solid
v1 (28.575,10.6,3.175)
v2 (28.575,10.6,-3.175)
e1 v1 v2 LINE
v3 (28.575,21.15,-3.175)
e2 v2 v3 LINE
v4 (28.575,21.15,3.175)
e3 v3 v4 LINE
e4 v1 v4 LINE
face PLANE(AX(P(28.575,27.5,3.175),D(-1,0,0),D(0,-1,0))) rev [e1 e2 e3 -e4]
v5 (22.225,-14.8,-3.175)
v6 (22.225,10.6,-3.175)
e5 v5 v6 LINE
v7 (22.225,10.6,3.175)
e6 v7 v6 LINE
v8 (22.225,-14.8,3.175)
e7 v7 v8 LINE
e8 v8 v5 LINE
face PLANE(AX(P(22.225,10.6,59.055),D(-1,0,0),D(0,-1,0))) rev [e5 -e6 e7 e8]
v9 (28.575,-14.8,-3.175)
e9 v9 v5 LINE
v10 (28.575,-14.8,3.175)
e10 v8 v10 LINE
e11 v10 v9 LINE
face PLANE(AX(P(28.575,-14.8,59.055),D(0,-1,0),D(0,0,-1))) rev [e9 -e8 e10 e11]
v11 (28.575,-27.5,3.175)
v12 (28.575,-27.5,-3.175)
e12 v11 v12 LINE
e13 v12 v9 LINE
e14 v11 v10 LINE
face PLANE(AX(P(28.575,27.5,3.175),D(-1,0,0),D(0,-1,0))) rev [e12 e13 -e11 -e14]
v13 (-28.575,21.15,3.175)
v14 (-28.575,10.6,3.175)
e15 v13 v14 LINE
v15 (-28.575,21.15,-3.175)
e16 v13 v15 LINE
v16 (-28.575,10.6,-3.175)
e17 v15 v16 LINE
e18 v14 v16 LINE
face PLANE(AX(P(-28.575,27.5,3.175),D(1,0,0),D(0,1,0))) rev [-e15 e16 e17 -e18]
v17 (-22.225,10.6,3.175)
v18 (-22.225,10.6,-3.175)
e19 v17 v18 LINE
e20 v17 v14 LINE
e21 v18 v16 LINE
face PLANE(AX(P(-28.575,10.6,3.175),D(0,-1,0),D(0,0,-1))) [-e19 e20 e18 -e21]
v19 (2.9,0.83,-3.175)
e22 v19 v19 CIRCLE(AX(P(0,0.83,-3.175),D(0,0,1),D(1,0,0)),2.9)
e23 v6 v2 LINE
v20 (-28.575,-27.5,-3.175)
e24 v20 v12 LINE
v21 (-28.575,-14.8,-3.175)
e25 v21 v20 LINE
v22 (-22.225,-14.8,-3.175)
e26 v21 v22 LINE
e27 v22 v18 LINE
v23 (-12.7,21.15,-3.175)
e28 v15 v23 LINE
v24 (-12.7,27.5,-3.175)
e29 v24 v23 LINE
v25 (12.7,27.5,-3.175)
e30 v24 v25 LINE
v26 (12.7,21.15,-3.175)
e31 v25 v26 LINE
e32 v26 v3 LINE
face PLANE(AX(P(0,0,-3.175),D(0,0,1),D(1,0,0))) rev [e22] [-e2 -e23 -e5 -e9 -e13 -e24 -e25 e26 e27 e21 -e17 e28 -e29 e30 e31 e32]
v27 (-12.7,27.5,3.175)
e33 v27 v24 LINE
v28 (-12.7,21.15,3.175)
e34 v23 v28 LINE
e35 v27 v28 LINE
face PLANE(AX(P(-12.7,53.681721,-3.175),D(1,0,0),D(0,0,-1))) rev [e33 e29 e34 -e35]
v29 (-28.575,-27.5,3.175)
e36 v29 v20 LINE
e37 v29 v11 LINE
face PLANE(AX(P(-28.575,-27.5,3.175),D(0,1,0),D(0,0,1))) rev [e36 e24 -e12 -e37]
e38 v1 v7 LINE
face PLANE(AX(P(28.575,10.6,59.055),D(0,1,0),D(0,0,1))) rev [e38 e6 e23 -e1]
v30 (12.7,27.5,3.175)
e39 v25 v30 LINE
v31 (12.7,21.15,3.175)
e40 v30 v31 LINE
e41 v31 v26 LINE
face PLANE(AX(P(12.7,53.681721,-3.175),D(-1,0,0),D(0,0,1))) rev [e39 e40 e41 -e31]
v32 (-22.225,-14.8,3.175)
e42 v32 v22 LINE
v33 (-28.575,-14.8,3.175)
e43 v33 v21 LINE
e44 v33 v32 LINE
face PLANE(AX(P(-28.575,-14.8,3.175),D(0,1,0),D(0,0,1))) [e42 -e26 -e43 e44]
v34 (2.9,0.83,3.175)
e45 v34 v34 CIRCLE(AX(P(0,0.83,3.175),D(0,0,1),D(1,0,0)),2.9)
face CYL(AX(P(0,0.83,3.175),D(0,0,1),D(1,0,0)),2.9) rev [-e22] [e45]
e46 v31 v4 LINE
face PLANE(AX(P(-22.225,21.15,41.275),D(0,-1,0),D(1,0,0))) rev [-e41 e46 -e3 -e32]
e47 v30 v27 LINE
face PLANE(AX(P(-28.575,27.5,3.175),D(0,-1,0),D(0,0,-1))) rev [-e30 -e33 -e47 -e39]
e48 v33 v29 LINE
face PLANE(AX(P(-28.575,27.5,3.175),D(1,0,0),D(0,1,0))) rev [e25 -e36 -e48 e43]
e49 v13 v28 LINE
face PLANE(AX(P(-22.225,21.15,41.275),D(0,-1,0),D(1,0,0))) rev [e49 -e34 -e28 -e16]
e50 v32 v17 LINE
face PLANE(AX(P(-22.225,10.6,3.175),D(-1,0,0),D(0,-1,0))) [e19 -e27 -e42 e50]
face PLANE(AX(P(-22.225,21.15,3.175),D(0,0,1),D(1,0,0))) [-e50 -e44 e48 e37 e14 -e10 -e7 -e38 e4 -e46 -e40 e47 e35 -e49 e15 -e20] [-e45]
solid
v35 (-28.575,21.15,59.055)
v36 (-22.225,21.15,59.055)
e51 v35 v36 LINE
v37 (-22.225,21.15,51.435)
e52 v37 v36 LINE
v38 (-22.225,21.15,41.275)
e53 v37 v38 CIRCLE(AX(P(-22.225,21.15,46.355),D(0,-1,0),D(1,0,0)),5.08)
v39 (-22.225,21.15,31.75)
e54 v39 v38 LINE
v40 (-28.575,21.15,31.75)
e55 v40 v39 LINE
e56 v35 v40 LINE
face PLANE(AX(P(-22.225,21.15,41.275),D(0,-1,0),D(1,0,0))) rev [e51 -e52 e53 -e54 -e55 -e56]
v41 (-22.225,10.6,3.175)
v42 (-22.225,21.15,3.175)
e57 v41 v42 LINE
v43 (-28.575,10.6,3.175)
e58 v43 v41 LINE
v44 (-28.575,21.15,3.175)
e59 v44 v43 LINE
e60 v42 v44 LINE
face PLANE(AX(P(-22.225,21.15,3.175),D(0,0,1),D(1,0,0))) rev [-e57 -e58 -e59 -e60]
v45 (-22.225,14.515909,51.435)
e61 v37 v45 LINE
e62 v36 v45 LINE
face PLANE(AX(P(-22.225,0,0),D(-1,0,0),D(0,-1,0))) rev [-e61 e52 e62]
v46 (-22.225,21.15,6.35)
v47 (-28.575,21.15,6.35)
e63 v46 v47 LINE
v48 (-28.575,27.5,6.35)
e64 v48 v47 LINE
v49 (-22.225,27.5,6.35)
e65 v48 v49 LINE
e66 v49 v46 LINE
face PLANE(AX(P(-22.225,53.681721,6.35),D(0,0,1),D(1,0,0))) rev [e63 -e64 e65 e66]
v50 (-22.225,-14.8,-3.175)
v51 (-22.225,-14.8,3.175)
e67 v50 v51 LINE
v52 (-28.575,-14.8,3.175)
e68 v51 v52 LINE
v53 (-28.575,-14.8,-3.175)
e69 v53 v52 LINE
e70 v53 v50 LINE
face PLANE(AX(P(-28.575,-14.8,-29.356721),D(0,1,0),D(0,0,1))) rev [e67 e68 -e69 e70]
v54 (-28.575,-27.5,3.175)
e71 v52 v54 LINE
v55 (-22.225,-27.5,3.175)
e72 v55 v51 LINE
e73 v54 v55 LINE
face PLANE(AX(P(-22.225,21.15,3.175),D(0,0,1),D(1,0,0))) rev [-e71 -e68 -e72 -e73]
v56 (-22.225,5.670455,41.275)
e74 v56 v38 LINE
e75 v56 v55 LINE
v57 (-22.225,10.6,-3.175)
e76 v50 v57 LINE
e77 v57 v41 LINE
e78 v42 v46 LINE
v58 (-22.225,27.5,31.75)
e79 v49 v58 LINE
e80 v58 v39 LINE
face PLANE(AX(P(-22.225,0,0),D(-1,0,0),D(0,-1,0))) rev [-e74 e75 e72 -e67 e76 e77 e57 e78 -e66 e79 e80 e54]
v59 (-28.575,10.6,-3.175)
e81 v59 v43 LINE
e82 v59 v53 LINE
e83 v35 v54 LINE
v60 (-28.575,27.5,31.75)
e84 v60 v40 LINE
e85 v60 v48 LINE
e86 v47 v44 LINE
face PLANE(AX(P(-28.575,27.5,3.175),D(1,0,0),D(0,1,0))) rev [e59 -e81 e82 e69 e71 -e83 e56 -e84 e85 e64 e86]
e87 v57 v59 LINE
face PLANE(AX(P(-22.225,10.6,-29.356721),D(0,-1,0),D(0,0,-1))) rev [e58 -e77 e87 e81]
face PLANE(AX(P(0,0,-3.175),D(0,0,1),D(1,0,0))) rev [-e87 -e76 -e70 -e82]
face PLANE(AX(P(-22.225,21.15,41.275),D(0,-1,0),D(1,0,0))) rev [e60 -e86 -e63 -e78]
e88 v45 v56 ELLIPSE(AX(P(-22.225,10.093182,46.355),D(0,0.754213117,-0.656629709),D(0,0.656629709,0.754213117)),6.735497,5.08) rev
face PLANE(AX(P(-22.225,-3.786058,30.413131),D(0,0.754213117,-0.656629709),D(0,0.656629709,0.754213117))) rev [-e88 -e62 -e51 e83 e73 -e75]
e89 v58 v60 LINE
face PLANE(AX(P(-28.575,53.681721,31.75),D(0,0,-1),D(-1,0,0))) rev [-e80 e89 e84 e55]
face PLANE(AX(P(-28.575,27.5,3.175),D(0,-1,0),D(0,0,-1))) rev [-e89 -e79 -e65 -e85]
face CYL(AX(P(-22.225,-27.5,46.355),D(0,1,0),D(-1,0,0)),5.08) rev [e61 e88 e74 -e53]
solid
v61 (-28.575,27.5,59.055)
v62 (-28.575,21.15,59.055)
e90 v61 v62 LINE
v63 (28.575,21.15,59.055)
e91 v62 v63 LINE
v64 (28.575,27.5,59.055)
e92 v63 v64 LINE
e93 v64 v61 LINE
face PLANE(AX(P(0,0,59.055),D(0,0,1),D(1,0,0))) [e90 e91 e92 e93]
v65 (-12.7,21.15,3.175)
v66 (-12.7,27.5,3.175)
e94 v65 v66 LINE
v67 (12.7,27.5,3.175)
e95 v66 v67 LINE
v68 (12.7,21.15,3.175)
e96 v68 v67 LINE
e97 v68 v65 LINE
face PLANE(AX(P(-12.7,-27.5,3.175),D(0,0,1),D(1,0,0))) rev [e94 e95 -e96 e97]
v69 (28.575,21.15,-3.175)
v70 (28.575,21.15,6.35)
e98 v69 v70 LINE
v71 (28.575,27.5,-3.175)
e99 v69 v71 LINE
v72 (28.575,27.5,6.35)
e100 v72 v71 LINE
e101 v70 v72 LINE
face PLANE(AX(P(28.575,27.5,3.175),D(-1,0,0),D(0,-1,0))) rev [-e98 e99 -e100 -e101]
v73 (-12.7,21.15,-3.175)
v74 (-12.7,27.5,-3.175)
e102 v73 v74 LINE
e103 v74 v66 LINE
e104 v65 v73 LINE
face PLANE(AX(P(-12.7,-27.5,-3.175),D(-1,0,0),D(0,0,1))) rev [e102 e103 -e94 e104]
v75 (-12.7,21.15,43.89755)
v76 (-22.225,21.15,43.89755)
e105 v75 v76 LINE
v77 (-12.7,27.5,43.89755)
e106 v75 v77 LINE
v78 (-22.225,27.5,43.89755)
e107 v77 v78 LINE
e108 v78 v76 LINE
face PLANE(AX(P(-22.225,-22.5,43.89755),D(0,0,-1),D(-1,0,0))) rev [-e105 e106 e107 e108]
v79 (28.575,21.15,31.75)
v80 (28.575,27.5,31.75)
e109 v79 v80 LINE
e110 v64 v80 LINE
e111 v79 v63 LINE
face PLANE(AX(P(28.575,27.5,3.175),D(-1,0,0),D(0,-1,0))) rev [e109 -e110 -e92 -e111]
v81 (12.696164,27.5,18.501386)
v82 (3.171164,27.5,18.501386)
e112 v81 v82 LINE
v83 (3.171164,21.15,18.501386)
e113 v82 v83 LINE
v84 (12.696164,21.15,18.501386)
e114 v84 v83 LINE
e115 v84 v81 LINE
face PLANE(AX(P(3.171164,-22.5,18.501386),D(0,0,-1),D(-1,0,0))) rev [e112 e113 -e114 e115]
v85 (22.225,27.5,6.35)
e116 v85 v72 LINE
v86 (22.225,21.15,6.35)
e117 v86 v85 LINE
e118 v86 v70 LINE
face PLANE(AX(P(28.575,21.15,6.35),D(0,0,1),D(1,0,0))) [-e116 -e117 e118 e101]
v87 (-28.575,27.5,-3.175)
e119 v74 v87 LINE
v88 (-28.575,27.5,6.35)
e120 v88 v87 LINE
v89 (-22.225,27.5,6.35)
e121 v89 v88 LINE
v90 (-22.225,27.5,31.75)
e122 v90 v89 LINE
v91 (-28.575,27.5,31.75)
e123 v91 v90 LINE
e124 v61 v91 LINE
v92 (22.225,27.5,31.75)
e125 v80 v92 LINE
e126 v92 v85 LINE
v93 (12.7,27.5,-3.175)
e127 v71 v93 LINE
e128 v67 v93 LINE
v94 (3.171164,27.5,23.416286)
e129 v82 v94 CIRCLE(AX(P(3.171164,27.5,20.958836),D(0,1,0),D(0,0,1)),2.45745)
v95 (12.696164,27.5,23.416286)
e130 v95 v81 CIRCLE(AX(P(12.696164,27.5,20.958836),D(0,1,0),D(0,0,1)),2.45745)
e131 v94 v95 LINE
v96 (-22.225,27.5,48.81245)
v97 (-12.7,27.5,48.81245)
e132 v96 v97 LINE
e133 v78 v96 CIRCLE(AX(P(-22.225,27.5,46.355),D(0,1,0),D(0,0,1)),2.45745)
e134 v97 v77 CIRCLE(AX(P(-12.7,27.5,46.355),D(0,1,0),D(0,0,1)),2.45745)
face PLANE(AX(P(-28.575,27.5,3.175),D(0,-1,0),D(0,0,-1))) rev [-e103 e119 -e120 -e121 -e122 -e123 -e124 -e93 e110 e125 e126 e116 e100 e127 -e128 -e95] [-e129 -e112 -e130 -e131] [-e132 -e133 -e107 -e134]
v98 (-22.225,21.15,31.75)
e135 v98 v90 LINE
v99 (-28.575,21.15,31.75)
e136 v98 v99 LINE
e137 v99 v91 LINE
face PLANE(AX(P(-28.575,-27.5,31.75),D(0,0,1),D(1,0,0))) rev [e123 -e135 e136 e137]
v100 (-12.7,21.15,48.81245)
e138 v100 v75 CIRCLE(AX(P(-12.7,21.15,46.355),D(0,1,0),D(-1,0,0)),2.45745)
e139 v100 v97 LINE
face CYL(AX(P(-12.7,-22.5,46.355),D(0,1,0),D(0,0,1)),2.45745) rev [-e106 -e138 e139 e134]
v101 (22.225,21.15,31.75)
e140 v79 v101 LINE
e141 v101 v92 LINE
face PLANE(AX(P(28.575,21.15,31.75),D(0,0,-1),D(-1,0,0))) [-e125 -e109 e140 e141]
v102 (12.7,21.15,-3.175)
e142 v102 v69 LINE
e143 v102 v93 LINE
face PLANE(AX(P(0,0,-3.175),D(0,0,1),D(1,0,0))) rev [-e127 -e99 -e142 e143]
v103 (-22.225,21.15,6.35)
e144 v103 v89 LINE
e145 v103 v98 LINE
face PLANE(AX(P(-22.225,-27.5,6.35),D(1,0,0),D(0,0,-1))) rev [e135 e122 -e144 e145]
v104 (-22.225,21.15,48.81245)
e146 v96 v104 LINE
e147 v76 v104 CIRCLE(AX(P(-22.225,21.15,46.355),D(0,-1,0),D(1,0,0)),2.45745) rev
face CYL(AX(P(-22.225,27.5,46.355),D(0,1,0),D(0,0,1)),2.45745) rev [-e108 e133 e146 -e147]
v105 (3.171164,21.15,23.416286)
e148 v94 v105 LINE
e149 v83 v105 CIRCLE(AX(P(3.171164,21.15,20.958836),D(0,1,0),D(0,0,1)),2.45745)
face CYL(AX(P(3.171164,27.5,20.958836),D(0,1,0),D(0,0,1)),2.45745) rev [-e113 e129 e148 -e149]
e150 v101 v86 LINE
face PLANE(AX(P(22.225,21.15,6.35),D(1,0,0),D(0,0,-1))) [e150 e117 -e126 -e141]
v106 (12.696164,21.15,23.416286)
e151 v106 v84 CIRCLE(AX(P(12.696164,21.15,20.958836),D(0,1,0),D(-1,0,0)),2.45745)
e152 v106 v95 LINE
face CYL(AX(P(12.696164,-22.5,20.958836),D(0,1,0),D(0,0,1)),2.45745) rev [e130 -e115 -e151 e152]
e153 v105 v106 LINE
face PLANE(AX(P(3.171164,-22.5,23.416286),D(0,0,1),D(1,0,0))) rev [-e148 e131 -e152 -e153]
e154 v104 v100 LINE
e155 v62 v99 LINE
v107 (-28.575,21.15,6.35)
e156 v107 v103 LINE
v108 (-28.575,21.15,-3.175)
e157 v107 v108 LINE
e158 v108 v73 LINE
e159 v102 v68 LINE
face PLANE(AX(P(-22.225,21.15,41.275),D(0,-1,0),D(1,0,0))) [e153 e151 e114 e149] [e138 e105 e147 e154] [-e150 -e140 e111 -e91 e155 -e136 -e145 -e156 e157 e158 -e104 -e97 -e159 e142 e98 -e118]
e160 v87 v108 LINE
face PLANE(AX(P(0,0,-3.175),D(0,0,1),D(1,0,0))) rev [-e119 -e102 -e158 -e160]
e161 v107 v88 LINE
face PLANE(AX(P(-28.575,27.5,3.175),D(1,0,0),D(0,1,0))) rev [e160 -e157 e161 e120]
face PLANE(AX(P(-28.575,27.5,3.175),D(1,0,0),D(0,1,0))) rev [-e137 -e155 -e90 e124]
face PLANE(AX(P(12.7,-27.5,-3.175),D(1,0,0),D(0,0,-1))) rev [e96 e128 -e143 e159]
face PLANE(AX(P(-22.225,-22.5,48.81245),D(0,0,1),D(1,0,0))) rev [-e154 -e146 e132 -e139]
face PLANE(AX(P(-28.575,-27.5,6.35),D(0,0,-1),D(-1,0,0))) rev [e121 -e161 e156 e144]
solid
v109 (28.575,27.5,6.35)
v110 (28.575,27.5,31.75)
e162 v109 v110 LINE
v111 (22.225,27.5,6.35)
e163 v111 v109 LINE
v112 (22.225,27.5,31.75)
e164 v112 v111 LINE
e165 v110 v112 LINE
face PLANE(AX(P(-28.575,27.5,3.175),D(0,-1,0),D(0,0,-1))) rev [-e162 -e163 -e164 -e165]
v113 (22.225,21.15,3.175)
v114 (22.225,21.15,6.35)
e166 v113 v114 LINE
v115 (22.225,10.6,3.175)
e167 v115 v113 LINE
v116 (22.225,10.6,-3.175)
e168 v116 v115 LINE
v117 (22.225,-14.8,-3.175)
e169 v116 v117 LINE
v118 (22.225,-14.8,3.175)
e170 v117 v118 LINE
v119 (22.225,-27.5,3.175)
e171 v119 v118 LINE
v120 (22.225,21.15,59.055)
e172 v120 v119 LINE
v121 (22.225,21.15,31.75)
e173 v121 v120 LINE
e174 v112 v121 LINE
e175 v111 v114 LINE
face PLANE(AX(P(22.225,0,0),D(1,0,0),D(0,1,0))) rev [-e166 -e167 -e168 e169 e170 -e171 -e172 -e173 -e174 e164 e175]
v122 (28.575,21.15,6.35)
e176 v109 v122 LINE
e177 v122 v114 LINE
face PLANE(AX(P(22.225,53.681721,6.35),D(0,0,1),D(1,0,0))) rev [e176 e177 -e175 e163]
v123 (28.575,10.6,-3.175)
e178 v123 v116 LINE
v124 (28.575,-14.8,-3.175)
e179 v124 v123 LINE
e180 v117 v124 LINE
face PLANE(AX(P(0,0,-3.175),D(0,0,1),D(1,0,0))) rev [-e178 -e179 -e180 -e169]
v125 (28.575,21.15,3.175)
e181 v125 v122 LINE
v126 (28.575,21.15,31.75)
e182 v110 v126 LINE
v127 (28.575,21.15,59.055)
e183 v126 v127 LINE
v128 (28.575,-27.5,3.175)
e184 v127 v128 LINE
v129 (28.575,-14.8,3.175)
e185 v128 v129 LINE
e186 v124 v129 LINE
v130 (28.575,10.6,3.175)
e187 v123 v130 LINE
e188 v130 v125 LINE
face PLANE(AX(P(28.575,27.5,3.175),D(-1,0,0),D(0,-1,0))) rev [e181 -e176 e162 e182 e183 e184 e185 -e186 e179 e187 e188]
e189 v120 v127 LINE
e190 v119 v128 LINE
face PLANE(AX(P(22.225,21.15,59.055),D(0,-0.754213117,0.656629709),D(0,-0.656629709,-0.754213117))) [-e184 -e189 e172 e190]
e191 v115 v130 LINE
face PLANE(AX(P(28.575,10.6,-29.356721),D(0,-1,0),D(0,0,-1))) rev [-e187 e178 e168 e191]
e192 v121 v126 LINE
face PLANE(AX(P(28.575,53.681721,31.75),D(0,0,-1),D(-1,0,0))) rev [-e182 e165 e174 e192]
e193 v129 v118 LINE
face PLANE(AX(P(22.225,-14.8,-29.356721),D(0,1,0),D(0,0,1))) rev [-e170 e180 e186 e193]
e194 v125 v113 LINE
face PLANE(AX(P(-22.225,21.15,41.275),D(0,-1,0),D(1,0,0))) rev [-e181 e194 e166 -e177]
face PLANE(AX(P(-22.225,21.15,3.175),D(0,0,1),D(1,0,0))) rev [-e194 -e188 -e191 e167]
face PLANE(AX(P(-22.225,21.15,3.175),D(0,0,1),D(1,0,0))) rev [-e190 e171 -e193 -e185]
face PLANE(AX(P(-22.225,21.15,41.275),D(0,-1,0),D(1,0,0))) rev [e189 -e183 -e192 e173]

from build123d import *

# Parameters (mm, degrees)
SKETCH1_W                 = 57.15
SKETCH1_H                 = 54.999999982
BOSS_EXTRUDE1_DEPTH       = 3.175
SKETCH2_W                 = 57.15
SKETCH2_H                 = 6.35
BOSS_EXTRUDE2_DEPTH       = 55.88
M5_CLEARANCE_HOLE1_D      = 5.8
M5_CLEARANCE_HOLE1_DEPTH  = 6.35
M5_CLEARANCE_HOLE1_TIP    = 1.742495795
BOSS_EXTRUDE3_DEPTH       = 6.35
BOSS_EXTRUDE4_START       = -57.15
BOSS_EXTRUDE4_DEPTH       = 6.35
F_8_CLEARANCE_HOLE1_D     = 4.9149
F_8_CLEARANCE_HOLE1_DEPTH = 6.35
F_8_CLEARANCE_HOLE1_TIP   = 1.476584928
CUT_EXTRUDE1_START        = -50
CUT_EXTRUDE1_DEPTH        = 50
SKETCH9_R                 = 5.08
CUT_EXTRUDE2_DEPTH        = 82.675248076
SPLIT2_START              = 3.175
SPLIT2_OUTLINE_W          = 6.35
SPLIT2_OUTLINE_H          = 50.149999991
SPLIT2_DEPTH              = 56.825
SPLIT2_START_2            = 22.225
SPLIT2_2_DEPTH            = 6.35
SPLIT2_START_3            = -28.575
SPLIT2_3_DEPTH            = 1.27
SPLIT2_START_4            = -27.305
SPLIT2_4_DEPTH            = 5.08
SPLIT2_START_5            = -27.499999991
SPLIT2_5_DEPTH            = 48.649999982
SKETCH10_W                = 25.4
SKETCH10_H                = 6.35
CUT_EXTRUDE4_DEPTH        = 86.609717019
SKETCH11_W                = 6.35
SKETCH11_H                = 25.4
CUT_EXTRUDE5_DEPTH        = 86.609717019
SKETCH12_W                = 25.4
SKETCH12_H                = 6.35
BOSS_EXTRUDE5_DEPTH       = 6.35
SKETCH13_W                = 6.35
SKETCH13_H                = 25.4
BOSS_EXTRUDE6_DEPTH       = 6.35
SKETCH14_W                = 6.35
SKETCH14_H                = 25.4
BOSS_EXTRUDE7_DEPTH       = 6.35
SKETCH15_W                = 6.35
SKETCH15_H                = 25.4
CUT_EXTRUDE6_DEPTH        = 74.792638688
SKETCH16_W                = 6.35
SKETCH16_H                = 25.4
BOSS_EXTRUDE8_DEPTH       = 6.35
SKETCH17_W                = 6.35
SKETCH17_H                = 25.4
BOSS_EXTRUDE9_DEPTH       = 6.35


with BuildPart() as part:
    # Sketch1 → Boss-Extrude1 (new, symmetric)
    with BuildSketch(Plane.XY):
        Rectangle(SKETCH1_W, SKETCH1_H)
    extrude(amount=BOSS_EXTRUDE1_DEPTH, both=True)

    # Sketch2 → Boss-Extrude2 (add)
    with BuildSketch(Plane.XY.offset(3.175)):
        with Locations((0, 24.324999991)):
            Rectangle(SKETCH2_W, SKETCH2_H)
    extrude(amount=BOSS_EXTRUDE2_DEPTH)

    # M5 Clearance Hole1
    with Locations(Plane.XY.offset(3.175)):
        with Locations((0, 0.829999991)):
            Hole(M5_CLEARANCE_HOLE1_D / 2, depth=M5_CLEARANCE_HOLE1_DEPTH)
            with Locations((0, 0, -(M5_CLEARANCE_HOLE1_DEPTH + M5_CLEARANCE_HOLE1_TIP / 2))):  # 118° drill point
                Cone(0, M5_CLEARANCE_HOLE1_D / 2, M5_CLEARANCE_HOLE1_TIP, mode=Mode.SUBTRACT)

    # Sketch8 → Boss-Extrude3 (add)
    with BuildSketch(Plane(origin=(28.575, 0, 0), x_dir=(0, 0, -1), z_dir=(1, 0, 0))):
        Polygon((-59.055, 21.149999991), (-3.175, -27.499999991), (-3.175, 21.149999991), align=None)
    extrude(amount=-BOSS_EXTRUDE3_DEPTH)

    # Sketch8<2> → Boss-Extrude4 (add)
    with BuildSketch(Plane(origin=(28.575, 0, 0), x_dir=(0, 0, -1), z_dir=(1, 0, 0)).offset(BOSS_EXTRUDE4_START)):
        Polygon((-59.055, 21.149999991), (-3.175, -27.499999991), (-3.175, 21.149999991), align=None)
    extrude(amount=BOSS_EXTRUDE4_DEPTH)

    # #8 Clearance Hole1
    with Locations(Plane(origin=(0, 27.499999991, 0), x_dir=(1, 0, 0), z_dir=(0, 1, 0))):
        with Locations((-22.225, -46.355), (3.17116431, -20.95883569)):
            Hole(F_8_CLEARANCE_HOLE1_D / 2, depth=F_8_CLEARANCE_HOLE1_DEPTH)
            with Locations((0, 0, -(F_8_CLEARANCE_HOLE1_DEPTH + F_8_CLEARANCE_HOLE1_TIP / 2))):  # 118° drill point
                Cone(0, F_8_CLEARANCE_HOLE1_D / 2, F_8_CLEARANCE_HOLE1_TIP, mode=Mode.SUBTRACT)

    # Sketch7 → Cut-Extrude1 (cut)
    with BuildSketch(Plane(origin=(0, 27.499999991, 0), x_dir=(1, 0, 0), z_dir=(0, 1, 0)).offset(CUT_EXTRUDE1_START)):
        with BuildLine():
            Line((-22.225, -43.89755), (-12.7, -43.89755))
            ThreePointArc((-12.7, -43.89755), (-10.24255, -46.355), (-12.7, -48.81245))
            Line((-12.7, -48.81245), (-22.225, -48.81245))
            ThreePointArc((-22.225, -48.81245), (-24.68245, -46.355), (-22.225, -43.89755))
        make_face()
        with BuildLine():
            Line((3.17116431, -18.50138569), (12.69616431, -18.50138569))
            ThreePointArc((12.69616431, -18.50138569), (15.15361431, -20.95883569), (12.69616431, -23.41628569))
            Line((12.69616431, -23.41628569), (3.17116431, -23.41628569))
            ThreePointArc((3.17116431, -23.41628569), (0.71371431, -20.95883569), (3.17116431, -18.50138569))
        make_face()
    extrude(amount=CUT_EXTRUDE1_DEPTH, mode=Mode.SUBTRACT)

    # Sketch9 → Cut-Extrude2 (cut, through all)
    with BuildSketch(Plane.XZ.offset(-21.149999991)):
        with Locations((-22.225, 46.355)):
            Circle(SKETCH9_R)
    extrude(amount=CUT_EXTRUDE2_DEPTH, mode=Mode.SUBTRACT)


with BuildPart() as body_2:
    # Split1: read off the stored shape, not the designer's step
    # Split1: the piece on the far side of the plane
    add(part.part)
    split(bisect_by=Plane(origin=(0, 21.149999991, 0), x_dir=(1, 0, 0), z_dir=(0, 1, 0)), keep=Keep.BOTTOM)

    # Split2: read off the stored shape, not the designer's step
    # Split2 outline → Split2 (cut)
    with BuildSketch(Plane.XY.offset(SPLIT2_START)):
        with Locations((-25.4, -3.925000005)):
            Rectangle(SPLIT2_OUTLINE_W, SPLIT2_OUTLINE_H)
        with Locations((25.4, -3.925000005)):
            Rectangle(SPLIT2_OUTLINE_W, SPLIT2_OUTLINE_H)
    extrude(amount=SPLIT2_DEPTH, mode=Mode.SUBTRACT)

    # Sketch12 → Boss-Extrude5 (add)
    with BuildSketch(Plane(origin=(0, 21.149999991, 0), x_dir=(1, 0, 0), z_dir=(0, 1, 0))):
        Rectangle(SKETCH12_W, SKETCH12_H)
    extrude(amount=BOSS_EXTRUDE5_DEPTH)

    # Sketch15 → Cut-Extrude6 (cut, through all)
    with BuildSketch(Plane(origin=(0, 0, -3.175), x_dir=(-1, 0, 0), z_dir=(0, 0, -1))):
        with Locations((-25.4, -2.099999991)):
            Rectangle(SKETCH15_W, SKETCH15_H)
    cut_extrude6 = extrude(amount=-CUT_EXTRUDE6_DEPTH, mode=Mode.SUBTRACT)

    # Mirror2: Cut-Extrude6 across plane
    add(cut_extrude6.mirror(Plane(origin=(0, 0, 0), x_dir=(0, 0, 1), z_dir=(1, 0, 0))), mode=Mode.SUBTRACT)


with BuildPart() as part_1:
    add(part.part)

    # Split1
    split(bisect_by=Plane(origin=(0, 21.149999991, 0), x_dir=(1, 0, 0), z_dir=(0, 1, 0)), keep=Keep.TOP)

    # Sketch10 → Cut-Extrude4 (cut, through all)
    with BuildSketch(Plane(origin=(0, 27.499999991, 0), x_dir=(1, 0, 0), z_dir=(0, 1, 0))):
        Rectangle(SKETCH10_W, SKETCH10_H)
    extrude(amount=-CUT_EXTRUDE4_DEPTH, mode=Mode.SUBTRACT)

    # Sketch11 → Cut-Extrude5 (cut, through all)
    with BuildSketch(Plane(origin=(0, 27.499999991, 0), x_dir=(1, 0, 0), z_dir=(0, 1, 0))):
        with Locations((-25.4, -19.05)):
            Rectangle(SKETCH11_W, SKETCH11_H)
    cut_extrude5 = extrude(amount=-CUT_EXTRUDE5_DEPTH, mode=Mode.SUBTRACT)

    # Mirror1: Cut-Extrude5 across plane
    add(cut_extrude5.mirror(Plane(origin=(0, 0, 0), x_dir=(0, 0, 1), z_dir=(1, 0, 0))), mode=Mode.SUBTRACT)


with BuildPart() as body_3:
    # Split2 2 outline → Split2 2 (new body)
    with BuildSketch(Plane.YZ.offset(SPLIT2_START_2)):
        Polygon((-27.499999991, 3.175), (21.149999991, 3.175), (21.149999991, 59.055), align=None)
    extrude(amount=SPLIT2_2_DEPTH)

    # Sketch14 → Boss-Extrude7 (add)
    with BuildSketch(Plane(origin=(0, 21.149999991, 0), x_dir=(1, 0, 0), z_dir=(0, 1, 0))):
        with Locations((25.4, -19.05)):
            Rectangle(SKETCH14_W, SKETCH14_H)
    extrude(amount=BOSS_EXTRUDE7_DEPTH)

    # Sketch16 → Boss-Extrude8 (add)
    with BuildSketch(Plane(origin=(0, 0, 3.175), x_dir=(-1, 0, 0), z_dir=(0, 0, -1))):
        with Locations((-25.4, -2.099999991)):
            Rectangle(SKETCH16_W, SKETCH16_H)
    extrude(amount=BOSS_EXTRUDE8_DEPTH)


with BuildPart() as body_4:
    # Split2 3 outline → Split2 3 (new body)
    with BuildSketch(Plane.YZ.offset(SPLIT2_START_3)):
        Polygon((-27.499999991, 3.175), (21.149999991, 3.175), (21.149999991, 59.055), align=None)
    extrude(amount=SPLIT2_3_DEPTH)

    # Split2 4 outline → Split2 4 (add)
    with BuildSketch(Plane.YZ.offset(SPLIT2_START_4)):
        Polygon((-27.499999991, 3.175), (21.149999991, 3.175), (21.149999991, 59.055), align=None)
    extrude(amount=SPLIT2_4_DEPTH)

    # Split2 5 outline → Split2 5 (cut)
    with BuildSketch(Plane(origin=(0, 0, 0), x_dir=(1, 0, 0), z_dir=(0, 1, 0)).offset(SPLIT2_START_5)):
        with BuildLine():
            Line((-22.225, -51.435), (-22.225, -41.275))
            ThreePointArc((-22.225, -41.275), (-27.305, -46.355), (-22.225, -51.435))
        make_face()
    extrude(amount=SPLIT2_5_DEPTH, mode=Mode.SUBTRACT)

    # Sketch13 → Boss-Extrude6 (add)
    with BuildSketch(Plane(origin=(0, 21.149999991, 0), x_dir=(1, 0, 0), z_dir=(0, 1, 0))):
        with Locations((-25.4, -19.05)):
            Rectangle(SKETCH13_W, SKETCH13_H)
    extrude(amount=BOSS_EXTRUDE6_DEPTH)

    # Sketch17 → Boss-Extrude9 (add)
    with BuildSketch(Plane(origin=(0, 0, 3.175), x_dir=(-1, 0, 0), z_dir=(0, 0, -1))):
        with Locations((25.4, -2.099999991)):
            Rectangle(SKETCH17_W, SKETCH17_H)
    extrude(amount=BOSS_EXTRUDE9_DEPTH)


solid = Compound([body_2.part, part_1.part, body_3.part, body_4.part])
